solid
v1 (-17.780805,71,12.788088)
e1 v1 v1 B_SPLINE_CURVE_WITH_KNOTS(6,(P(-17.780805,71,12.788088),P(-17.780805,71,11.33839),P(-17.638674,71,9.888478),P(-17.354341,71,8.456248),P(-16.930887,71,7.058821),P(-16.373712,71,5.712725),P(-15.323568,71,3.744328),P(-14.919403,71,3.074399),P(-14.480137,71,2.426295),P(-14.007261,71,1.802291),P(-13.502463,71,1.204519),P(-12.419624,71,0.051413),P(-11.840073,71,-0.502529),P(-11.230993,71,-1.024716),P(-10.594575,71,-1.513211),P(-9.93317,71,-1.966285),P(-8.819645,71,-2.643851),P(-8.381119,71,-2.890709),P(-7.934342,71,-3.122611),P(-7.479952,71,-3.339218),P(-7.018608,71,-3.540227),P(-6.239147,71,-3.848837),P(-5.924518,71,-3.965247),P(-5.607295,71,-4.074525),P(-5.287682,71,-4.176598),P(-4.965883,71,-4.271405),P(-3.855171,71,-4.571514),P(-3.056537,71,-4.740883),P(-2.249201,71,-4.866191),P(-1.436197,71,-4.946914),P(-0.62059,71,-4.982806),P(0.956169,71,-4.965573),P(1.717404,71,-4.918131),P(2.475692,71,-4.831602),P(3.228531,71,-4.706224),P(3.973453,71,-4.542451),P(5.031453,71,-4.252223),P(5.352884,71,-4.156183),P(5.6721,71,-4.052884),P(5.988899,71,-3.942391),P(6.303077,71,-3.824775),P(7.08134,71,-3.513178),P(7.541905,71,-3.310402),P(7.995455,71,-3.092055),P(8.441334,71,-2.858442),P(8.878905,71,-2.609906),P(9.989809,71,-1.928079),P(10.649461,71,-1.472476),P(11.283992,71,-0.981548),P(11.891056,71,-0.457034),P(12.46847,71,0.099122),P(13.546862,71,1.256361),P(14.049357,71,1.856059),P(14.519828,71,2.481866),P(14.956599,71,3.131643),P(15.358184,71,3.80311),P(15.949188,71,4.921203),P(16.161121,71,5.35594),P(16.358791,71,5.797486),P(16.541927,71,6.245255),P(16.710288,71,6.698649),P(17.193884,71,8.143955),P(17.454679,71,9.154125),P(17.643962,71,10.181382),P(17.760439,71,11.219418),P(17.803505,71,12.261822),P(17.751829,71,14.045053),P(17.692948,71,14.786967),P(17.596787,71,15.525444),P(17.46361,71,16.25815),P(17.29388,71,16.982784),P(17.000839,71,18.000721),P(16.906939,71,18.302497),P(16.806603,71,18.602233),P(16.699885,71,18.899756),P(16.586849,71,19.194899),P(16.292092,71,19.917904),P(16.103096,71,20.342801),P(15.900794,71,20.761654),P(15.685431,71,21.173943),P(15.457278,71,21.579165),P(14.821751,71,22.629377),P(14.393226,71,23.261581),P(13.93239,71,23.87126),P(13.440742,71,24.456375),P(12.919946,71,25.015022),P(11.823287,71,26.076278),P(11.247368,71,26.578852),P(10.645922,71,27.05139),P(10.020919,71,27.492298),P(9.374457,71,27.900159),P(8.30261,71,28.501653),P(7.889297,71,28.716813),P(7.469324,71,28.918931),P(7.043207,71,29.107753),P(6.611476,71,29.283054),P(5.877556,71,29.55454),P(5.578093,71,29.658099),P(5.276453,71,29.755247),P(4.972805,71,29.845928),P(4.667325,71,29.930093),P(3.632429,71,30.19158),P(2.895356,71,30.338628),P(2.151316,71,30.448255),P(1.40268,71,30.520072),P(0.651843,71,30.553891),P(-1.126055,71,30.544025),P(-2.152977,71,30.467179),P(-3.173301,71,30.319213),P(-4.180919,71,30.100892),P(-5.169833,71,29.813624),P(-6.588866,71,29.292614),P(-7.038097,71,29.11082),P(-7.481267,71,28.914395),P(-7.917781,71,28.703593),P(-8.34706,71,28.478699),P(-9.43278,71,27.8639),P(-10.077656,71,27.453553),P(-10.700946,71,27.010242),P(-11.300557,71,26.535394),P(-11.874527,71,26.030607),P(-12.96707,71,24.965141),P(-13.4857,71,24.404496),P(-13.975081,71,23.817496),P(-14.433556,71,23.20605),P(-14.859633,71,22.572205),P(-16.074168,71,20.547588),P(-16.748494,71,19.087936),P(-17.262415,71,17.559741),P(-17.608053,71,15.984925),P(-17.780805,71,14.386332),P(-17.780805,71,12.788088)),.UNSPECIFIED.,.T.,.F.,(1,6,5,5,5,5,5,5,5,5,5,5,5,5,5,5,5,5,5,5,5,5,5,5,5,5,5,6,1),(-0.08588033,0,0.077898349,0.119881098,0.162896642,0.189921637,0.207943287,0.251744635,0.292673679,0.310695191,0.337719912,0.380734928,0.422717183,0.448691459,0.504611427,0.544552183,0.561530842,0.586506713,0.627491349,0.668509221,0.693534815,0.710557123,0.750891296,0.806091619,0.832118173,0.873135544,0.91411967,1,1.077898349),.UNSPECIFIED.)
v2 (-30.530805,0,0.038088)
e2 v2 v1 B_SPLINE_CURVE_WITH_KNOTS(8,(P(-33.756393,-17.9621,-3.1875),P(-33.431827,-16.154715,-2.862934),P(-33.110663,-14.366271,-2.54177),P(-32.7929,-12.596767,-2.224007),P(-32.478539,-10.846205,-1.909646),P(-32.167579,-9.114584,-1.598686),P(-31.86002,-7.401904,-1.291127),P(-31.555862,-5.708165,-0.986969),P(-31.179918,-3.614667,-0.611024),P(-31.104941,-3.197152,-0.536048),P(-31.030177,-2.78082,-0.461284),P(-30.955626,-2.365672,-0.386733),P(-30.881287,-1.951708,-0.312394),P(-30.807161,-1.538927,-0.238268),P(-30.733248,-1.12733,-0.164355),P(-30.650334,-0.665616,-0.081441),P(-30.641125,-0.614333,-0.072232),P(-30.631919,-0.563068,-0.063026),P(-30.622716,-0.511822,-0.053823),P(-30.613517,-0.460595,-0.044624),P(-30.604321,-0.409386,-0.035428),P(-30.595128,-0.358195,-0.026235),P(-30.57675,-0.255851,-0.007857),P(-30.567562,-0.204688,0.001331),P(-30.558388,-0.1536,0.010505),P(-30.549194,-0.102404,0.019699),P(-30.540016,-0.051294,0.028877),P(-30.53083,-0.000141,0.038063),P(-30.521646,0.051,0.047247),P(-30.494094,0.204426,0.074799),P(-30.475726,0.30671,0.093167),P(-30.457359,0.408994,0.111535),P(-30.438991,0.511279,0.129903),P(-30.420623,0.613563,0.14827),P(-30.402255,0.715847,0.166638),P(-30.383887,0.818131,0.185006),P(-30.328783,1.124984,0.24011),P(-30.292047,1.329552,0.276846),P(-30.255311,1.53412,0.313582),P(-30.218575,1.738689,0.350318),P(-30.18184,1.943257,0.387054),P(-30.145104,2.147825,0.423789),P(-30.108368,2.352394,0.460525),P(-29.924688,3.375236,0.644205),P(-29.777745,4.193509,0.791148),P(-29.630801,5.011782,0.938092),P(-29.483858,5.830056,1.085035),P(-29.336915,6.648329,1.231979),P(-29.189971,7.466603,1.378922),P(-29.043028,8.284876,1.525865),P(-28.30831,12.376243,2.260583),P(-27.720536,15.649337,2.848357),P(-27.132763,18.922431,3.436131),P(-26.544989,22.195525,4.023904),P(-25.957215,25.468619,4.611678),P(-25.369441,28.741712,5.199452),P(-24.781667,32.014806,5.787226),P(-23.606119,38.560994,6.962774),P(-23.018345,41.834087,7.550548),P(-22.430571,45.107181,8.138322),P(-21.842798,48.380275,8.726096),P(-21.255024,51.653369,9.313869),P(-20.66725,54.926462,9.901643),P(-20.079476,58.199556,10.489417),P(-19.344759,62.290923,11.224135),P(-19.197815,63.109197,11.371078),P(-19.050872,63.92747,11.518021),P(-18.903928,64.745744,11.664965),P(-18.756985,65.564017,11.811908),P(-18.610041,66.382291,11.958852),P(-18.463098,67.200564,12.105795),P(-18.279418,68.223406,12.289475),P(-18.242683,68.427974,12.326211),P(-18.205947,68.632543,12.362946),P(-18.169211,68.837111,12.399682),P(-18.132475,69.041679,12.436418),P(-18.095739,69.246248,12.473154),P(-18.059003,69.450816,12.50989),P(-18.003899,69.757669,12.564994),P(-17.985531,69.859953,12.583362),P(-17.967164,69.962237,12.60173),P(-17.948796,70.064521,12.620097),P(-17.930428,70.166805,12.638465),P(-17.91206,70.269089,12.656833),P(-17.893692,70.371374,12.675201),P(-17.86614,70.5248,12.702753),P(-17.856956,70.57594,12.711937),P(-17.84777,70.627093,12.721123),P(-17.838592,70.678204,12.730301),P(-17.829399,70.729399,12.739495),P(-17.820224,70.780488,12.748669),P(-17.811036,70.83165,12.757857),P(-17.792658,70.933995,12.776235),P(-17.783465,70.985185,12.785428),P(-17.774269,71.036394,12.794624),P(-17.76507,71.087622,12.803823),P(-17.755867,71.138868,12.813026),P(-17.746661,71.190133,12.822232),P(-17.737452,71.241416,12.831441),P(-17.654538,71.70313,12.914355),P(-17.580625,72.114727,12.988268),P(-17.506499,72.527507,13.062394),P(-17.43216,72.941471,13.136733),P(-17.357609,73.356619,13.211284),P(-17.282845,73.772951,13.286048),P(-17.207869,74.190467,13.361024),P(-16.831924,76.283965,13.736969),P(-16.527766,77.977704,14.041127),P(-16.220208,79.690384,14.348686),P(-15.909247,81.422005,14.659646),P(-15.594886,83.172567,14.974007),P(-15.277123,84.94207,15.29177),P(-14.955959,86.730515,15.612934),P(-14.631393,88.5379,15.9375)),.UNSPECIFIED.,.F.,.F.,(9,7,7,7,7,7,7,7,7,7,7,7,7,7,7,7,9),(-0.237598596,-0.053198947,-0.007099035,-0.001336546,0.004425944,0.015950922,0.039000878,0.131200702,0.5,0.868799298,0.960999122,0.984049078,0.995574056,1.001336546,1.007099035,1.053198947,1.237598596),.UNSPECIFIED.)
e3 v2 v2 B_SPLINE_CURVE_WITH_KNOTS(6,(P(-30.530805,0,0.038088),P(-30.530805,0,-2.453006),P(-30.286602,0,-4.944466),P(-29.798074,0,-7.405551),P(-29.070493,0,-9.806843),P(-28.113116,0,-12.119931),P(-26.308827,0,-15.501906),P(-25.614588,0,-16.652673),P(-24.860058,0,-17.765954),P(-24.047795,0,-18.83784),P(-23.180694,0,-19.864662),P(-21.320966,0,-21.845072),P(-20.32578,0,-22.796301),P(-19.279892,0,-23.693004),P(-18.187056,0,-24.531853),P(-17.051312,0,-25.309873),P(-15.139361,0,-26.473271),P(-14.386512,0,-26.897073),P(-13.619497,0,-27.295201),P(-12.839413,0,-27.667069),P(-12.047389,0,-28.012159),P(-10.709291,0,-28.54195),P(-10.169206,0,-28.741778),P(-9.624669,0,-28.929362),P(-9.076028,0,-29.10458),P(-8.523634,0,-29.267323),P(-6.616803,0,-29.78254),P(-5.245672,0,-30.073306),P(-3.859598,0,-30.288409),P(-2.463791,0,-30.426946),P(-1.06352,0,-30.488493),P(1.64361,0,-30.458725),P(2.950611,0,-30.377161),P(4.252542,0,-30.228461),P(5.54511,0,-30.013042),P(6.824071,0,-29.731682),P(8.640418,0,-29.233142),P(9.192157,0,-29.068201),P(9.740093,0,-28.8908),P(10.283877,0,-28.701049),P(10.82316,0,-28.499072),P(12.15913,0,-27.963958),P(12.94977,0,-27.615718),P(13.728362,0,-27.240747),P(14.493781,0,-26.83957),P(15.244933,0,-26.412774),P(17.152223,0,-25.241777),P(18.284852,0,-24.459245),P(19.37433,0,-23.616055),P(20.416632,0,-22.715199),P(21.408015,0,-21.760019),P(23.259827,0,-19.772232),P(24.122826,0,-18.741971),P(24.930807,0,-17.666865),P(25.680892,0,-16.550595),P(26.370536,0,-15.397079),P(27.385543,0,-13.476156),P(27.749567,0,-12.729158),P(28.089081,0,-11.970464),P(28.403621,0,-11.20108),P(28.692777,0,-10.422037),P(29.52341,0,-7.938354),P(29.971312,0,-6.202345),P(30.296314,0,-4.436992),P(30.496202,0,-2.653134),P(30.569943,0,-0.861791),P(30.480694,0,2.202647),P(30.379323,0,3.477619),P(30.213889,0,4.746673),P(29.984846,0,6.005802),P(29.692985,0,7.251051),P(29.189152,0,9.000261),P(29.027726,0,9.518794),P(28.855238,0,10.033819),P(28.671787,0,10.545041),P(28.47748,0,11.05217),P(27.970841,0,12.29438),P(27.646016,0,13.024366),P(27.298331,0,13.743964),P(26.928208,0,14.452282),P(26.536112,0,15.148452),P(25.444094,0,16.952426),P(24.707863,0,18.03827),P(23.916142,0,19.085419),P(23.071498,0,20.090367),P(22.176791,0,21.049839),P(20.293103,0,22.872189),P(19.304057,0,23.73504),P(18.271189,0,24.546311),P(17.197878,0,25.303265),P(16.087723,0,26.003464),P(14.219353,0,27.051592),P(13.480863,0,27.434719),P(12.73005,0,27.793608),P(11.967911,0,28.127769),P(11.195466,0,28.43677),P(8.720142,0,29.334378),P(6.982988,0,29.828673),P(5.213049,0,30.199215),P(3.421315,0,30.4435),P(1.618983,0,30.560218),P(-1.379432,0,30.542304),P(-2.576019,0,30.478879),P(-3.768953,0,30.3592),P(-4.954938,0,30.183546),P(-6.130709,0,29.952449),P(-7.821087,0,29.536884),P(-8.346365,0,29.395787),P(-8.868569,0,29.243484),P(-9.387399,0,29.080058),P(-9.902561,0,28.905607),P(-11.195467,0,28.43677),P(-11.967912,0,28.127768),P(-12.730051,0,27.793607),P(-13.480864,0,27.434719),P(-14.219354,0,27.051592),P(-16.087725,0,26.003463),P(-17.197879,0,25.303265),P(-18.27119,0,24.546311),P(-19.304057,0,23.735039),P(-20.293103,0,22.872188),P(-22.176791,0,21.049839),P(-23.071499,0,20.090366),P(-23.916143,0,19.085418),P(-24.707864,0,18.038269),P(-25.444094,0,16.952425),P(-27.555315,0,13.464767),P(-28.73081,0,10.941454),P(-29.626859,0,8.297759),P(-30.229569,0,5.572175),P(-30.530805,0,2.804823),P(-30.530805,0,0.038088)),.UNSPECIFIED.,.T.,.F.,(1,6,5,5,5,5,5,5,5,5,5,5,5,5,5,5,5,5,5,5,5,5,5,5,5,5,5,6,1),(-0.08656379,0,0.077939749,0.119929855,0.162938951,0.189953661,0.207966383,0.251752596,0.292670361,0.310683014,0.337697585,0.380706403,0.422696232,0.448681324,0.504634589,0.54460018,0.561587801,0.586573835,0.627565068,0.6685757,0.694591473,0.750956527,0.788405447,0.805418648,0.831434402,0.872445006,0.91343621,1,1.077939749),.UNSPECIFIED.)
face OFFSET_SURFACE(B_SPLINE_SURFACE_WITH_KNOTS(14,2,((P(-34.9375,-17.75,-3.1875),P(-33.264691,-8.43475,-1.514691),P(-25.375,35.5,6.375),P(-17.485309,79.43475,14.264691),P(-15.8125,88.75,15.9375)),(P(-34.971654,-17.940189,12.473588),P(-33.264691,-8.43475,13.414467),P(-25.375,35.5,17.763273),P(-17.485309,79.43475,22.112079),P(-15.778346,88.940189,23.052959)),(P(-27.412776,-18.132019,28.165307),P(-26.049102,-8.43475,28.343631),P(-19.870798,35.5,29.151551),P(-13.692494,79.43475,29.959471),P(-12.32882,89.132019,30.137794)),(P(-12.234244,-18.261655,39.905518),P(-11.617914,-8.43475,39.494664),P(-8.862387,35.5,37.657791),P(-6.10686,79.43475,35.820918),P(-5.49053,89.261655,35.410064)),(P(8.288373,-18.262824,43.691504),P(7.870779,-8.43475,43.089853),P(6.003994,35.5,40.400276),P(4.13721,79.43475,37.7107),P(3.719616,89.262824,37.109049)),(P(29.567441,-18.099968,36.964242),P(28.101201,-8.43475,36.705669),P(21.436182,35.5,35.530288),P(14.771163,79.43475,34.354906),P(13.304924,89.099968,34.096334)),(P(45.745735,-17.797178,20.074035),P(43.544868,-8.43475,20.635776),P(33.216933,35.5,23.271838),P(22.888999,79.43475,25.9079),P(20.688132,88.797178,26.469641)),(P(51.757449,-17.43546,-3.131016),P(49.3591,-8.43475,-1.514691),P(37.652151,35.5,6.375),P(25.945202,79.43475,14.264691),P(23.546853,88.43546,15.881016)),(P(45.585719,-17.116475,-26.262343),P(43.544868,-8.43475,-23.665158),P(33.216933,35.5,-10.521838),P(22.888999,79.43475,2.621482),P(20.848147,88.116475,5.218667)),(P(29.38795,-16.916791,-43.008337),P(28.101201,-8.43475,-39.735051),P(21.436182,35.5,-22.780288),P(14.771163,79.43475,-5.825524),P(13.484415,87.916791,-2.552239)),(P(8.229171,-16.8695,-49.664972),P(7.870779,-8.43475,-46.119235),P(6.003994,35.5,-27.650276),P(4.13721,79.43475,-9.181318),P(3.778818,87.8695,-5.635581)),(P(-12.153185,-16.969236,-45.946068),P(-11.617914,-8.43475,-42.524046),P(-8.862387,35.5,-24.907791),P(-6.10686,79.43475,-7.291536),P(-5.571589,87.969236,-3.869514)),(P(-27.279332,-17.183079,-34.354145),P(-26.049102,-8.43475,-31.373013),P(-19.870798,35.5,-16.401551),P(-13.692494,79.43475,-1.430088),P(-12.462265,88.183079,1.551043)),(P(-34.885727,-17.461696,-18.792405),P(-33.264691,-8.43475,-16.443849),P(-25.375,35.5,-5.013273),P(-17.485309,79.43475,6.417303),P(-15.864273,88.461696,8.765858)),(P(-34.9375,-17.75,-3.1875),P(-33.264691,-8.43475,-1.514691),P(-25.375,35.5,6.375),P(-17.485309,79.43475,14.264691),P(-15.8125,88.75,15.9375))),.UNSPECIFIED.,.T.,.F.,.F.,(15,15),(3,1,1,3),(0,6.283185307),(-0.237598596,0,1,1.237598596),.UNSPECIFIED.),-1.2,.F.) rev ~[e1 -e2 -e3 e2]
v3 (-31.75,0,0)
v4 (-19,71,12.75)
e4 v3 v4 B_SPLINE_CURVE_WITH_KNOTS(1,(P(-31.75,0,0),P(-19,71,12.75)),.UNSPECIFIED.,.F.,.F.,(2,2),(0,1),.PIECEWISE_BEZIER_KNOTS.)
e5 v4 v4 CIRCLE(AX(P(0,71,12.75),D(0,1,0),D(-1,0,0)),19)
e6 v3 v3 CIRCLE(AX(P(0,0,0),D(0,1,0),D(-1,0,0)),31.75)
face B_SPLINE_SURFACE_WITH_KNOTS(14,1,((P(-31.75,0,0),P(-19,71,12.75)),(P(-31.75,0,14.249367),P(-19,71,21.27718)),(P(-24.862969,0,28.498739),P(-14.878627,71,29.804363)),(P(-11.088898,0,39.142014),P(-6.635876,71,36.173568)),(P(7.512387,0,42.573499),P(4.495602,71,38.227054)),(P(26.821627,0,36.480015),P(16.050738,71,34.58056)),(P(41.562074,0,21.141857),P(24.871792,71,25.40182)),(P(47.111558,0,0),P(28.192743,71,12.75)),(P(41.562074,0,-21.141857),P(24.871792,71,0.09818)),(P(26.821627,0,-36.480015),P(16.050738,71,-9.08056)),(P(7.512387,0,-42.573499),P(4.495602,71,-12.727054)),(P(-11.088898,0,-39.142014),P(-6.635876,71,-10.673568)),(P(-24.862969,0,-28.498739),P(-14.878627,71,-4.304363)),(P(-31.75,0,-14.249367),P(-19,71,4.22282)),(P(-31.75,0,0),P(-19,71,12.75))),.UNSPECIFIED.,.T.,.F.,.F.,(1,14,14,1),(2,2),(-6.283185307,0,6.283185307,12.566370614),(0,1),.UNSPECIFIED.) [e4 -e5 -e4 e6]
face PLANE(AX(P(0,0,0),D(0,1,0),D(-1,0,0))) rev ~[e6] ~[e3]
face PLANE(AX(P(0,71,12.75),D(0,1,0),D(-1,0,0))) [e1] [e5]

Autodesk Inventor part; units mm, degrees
ref_plane "YZ Plane" through (0, 0, 0) normal (1, 0, 0) x (0, 1, 0)
ref_plane "XY Plane" through (0, 0, 0) normal (0, 0, 1) x (1, 0, 0)
sketch "Szkic6" plane through (0, 0, 0) normal (0, 1, 0) x (-1, 0, 0)
  circle A0 centre (0, 0) radius 31.75
  dimension "d33" = 63.5
ref_plane "Płaszczyzna konstrukcyjna1" through (0, 71, 0) normal (0, 1, 0) x (-1, 0, 0)
sketch "Szkic7" plane through (0, 71, 0) normal (0, 1, 0) x (-1, 0, 0)
  circle A0 centre (0, 12.75) radius 19
  line L0 (0, -20.3) -> (0, 20.3) construction
  circle A1 centre (0, 0) radius 31.75 construction
  dimension "d35" = 38
loft "Wyciągnięcie złożone1" add profiles "Szkic6", "Szkic7"
shell "Skorupa1" thickness 1.2 removed faces 2 at (-4.1255, 71, 9.4414) at (14.3997, 0, 5.5289)
equation "\"d33\" = OD1"
equation "\"d35\" = OD2"
equation "\"d52\" = THK"
equation "\"SzerokośćGięciaPodcięcia\" = Grubość"
equation "\"RozmiarPodcięciaNarożnika\" = 4 * Grubość"
equation "\"PromieńPrzejścia\" = PromieńGięcia"
equation "\"Rozmiar_promienia_Jacobiego\" = PromieńGięcia"
equation "\"Wielk_odstępu\" = Grubość"
equation "\"d2\" = PromieńGięcia"
equation "\"d23\" = PromieńGięcia"
equation "\"OD1\" = 63.5"
equation "\"OD2\" = 38"
equation "\"L\" = 71"
equation "\"THK\" = 1.2"
equation "\"d34\" = L"
equation "\"Grubość\" = 1.5"
equation "\"PromieńGięcia\" = 3"
properties part number "Redukcja asymetryczna Ø63,5x38x1,2 L=71" material "304"
